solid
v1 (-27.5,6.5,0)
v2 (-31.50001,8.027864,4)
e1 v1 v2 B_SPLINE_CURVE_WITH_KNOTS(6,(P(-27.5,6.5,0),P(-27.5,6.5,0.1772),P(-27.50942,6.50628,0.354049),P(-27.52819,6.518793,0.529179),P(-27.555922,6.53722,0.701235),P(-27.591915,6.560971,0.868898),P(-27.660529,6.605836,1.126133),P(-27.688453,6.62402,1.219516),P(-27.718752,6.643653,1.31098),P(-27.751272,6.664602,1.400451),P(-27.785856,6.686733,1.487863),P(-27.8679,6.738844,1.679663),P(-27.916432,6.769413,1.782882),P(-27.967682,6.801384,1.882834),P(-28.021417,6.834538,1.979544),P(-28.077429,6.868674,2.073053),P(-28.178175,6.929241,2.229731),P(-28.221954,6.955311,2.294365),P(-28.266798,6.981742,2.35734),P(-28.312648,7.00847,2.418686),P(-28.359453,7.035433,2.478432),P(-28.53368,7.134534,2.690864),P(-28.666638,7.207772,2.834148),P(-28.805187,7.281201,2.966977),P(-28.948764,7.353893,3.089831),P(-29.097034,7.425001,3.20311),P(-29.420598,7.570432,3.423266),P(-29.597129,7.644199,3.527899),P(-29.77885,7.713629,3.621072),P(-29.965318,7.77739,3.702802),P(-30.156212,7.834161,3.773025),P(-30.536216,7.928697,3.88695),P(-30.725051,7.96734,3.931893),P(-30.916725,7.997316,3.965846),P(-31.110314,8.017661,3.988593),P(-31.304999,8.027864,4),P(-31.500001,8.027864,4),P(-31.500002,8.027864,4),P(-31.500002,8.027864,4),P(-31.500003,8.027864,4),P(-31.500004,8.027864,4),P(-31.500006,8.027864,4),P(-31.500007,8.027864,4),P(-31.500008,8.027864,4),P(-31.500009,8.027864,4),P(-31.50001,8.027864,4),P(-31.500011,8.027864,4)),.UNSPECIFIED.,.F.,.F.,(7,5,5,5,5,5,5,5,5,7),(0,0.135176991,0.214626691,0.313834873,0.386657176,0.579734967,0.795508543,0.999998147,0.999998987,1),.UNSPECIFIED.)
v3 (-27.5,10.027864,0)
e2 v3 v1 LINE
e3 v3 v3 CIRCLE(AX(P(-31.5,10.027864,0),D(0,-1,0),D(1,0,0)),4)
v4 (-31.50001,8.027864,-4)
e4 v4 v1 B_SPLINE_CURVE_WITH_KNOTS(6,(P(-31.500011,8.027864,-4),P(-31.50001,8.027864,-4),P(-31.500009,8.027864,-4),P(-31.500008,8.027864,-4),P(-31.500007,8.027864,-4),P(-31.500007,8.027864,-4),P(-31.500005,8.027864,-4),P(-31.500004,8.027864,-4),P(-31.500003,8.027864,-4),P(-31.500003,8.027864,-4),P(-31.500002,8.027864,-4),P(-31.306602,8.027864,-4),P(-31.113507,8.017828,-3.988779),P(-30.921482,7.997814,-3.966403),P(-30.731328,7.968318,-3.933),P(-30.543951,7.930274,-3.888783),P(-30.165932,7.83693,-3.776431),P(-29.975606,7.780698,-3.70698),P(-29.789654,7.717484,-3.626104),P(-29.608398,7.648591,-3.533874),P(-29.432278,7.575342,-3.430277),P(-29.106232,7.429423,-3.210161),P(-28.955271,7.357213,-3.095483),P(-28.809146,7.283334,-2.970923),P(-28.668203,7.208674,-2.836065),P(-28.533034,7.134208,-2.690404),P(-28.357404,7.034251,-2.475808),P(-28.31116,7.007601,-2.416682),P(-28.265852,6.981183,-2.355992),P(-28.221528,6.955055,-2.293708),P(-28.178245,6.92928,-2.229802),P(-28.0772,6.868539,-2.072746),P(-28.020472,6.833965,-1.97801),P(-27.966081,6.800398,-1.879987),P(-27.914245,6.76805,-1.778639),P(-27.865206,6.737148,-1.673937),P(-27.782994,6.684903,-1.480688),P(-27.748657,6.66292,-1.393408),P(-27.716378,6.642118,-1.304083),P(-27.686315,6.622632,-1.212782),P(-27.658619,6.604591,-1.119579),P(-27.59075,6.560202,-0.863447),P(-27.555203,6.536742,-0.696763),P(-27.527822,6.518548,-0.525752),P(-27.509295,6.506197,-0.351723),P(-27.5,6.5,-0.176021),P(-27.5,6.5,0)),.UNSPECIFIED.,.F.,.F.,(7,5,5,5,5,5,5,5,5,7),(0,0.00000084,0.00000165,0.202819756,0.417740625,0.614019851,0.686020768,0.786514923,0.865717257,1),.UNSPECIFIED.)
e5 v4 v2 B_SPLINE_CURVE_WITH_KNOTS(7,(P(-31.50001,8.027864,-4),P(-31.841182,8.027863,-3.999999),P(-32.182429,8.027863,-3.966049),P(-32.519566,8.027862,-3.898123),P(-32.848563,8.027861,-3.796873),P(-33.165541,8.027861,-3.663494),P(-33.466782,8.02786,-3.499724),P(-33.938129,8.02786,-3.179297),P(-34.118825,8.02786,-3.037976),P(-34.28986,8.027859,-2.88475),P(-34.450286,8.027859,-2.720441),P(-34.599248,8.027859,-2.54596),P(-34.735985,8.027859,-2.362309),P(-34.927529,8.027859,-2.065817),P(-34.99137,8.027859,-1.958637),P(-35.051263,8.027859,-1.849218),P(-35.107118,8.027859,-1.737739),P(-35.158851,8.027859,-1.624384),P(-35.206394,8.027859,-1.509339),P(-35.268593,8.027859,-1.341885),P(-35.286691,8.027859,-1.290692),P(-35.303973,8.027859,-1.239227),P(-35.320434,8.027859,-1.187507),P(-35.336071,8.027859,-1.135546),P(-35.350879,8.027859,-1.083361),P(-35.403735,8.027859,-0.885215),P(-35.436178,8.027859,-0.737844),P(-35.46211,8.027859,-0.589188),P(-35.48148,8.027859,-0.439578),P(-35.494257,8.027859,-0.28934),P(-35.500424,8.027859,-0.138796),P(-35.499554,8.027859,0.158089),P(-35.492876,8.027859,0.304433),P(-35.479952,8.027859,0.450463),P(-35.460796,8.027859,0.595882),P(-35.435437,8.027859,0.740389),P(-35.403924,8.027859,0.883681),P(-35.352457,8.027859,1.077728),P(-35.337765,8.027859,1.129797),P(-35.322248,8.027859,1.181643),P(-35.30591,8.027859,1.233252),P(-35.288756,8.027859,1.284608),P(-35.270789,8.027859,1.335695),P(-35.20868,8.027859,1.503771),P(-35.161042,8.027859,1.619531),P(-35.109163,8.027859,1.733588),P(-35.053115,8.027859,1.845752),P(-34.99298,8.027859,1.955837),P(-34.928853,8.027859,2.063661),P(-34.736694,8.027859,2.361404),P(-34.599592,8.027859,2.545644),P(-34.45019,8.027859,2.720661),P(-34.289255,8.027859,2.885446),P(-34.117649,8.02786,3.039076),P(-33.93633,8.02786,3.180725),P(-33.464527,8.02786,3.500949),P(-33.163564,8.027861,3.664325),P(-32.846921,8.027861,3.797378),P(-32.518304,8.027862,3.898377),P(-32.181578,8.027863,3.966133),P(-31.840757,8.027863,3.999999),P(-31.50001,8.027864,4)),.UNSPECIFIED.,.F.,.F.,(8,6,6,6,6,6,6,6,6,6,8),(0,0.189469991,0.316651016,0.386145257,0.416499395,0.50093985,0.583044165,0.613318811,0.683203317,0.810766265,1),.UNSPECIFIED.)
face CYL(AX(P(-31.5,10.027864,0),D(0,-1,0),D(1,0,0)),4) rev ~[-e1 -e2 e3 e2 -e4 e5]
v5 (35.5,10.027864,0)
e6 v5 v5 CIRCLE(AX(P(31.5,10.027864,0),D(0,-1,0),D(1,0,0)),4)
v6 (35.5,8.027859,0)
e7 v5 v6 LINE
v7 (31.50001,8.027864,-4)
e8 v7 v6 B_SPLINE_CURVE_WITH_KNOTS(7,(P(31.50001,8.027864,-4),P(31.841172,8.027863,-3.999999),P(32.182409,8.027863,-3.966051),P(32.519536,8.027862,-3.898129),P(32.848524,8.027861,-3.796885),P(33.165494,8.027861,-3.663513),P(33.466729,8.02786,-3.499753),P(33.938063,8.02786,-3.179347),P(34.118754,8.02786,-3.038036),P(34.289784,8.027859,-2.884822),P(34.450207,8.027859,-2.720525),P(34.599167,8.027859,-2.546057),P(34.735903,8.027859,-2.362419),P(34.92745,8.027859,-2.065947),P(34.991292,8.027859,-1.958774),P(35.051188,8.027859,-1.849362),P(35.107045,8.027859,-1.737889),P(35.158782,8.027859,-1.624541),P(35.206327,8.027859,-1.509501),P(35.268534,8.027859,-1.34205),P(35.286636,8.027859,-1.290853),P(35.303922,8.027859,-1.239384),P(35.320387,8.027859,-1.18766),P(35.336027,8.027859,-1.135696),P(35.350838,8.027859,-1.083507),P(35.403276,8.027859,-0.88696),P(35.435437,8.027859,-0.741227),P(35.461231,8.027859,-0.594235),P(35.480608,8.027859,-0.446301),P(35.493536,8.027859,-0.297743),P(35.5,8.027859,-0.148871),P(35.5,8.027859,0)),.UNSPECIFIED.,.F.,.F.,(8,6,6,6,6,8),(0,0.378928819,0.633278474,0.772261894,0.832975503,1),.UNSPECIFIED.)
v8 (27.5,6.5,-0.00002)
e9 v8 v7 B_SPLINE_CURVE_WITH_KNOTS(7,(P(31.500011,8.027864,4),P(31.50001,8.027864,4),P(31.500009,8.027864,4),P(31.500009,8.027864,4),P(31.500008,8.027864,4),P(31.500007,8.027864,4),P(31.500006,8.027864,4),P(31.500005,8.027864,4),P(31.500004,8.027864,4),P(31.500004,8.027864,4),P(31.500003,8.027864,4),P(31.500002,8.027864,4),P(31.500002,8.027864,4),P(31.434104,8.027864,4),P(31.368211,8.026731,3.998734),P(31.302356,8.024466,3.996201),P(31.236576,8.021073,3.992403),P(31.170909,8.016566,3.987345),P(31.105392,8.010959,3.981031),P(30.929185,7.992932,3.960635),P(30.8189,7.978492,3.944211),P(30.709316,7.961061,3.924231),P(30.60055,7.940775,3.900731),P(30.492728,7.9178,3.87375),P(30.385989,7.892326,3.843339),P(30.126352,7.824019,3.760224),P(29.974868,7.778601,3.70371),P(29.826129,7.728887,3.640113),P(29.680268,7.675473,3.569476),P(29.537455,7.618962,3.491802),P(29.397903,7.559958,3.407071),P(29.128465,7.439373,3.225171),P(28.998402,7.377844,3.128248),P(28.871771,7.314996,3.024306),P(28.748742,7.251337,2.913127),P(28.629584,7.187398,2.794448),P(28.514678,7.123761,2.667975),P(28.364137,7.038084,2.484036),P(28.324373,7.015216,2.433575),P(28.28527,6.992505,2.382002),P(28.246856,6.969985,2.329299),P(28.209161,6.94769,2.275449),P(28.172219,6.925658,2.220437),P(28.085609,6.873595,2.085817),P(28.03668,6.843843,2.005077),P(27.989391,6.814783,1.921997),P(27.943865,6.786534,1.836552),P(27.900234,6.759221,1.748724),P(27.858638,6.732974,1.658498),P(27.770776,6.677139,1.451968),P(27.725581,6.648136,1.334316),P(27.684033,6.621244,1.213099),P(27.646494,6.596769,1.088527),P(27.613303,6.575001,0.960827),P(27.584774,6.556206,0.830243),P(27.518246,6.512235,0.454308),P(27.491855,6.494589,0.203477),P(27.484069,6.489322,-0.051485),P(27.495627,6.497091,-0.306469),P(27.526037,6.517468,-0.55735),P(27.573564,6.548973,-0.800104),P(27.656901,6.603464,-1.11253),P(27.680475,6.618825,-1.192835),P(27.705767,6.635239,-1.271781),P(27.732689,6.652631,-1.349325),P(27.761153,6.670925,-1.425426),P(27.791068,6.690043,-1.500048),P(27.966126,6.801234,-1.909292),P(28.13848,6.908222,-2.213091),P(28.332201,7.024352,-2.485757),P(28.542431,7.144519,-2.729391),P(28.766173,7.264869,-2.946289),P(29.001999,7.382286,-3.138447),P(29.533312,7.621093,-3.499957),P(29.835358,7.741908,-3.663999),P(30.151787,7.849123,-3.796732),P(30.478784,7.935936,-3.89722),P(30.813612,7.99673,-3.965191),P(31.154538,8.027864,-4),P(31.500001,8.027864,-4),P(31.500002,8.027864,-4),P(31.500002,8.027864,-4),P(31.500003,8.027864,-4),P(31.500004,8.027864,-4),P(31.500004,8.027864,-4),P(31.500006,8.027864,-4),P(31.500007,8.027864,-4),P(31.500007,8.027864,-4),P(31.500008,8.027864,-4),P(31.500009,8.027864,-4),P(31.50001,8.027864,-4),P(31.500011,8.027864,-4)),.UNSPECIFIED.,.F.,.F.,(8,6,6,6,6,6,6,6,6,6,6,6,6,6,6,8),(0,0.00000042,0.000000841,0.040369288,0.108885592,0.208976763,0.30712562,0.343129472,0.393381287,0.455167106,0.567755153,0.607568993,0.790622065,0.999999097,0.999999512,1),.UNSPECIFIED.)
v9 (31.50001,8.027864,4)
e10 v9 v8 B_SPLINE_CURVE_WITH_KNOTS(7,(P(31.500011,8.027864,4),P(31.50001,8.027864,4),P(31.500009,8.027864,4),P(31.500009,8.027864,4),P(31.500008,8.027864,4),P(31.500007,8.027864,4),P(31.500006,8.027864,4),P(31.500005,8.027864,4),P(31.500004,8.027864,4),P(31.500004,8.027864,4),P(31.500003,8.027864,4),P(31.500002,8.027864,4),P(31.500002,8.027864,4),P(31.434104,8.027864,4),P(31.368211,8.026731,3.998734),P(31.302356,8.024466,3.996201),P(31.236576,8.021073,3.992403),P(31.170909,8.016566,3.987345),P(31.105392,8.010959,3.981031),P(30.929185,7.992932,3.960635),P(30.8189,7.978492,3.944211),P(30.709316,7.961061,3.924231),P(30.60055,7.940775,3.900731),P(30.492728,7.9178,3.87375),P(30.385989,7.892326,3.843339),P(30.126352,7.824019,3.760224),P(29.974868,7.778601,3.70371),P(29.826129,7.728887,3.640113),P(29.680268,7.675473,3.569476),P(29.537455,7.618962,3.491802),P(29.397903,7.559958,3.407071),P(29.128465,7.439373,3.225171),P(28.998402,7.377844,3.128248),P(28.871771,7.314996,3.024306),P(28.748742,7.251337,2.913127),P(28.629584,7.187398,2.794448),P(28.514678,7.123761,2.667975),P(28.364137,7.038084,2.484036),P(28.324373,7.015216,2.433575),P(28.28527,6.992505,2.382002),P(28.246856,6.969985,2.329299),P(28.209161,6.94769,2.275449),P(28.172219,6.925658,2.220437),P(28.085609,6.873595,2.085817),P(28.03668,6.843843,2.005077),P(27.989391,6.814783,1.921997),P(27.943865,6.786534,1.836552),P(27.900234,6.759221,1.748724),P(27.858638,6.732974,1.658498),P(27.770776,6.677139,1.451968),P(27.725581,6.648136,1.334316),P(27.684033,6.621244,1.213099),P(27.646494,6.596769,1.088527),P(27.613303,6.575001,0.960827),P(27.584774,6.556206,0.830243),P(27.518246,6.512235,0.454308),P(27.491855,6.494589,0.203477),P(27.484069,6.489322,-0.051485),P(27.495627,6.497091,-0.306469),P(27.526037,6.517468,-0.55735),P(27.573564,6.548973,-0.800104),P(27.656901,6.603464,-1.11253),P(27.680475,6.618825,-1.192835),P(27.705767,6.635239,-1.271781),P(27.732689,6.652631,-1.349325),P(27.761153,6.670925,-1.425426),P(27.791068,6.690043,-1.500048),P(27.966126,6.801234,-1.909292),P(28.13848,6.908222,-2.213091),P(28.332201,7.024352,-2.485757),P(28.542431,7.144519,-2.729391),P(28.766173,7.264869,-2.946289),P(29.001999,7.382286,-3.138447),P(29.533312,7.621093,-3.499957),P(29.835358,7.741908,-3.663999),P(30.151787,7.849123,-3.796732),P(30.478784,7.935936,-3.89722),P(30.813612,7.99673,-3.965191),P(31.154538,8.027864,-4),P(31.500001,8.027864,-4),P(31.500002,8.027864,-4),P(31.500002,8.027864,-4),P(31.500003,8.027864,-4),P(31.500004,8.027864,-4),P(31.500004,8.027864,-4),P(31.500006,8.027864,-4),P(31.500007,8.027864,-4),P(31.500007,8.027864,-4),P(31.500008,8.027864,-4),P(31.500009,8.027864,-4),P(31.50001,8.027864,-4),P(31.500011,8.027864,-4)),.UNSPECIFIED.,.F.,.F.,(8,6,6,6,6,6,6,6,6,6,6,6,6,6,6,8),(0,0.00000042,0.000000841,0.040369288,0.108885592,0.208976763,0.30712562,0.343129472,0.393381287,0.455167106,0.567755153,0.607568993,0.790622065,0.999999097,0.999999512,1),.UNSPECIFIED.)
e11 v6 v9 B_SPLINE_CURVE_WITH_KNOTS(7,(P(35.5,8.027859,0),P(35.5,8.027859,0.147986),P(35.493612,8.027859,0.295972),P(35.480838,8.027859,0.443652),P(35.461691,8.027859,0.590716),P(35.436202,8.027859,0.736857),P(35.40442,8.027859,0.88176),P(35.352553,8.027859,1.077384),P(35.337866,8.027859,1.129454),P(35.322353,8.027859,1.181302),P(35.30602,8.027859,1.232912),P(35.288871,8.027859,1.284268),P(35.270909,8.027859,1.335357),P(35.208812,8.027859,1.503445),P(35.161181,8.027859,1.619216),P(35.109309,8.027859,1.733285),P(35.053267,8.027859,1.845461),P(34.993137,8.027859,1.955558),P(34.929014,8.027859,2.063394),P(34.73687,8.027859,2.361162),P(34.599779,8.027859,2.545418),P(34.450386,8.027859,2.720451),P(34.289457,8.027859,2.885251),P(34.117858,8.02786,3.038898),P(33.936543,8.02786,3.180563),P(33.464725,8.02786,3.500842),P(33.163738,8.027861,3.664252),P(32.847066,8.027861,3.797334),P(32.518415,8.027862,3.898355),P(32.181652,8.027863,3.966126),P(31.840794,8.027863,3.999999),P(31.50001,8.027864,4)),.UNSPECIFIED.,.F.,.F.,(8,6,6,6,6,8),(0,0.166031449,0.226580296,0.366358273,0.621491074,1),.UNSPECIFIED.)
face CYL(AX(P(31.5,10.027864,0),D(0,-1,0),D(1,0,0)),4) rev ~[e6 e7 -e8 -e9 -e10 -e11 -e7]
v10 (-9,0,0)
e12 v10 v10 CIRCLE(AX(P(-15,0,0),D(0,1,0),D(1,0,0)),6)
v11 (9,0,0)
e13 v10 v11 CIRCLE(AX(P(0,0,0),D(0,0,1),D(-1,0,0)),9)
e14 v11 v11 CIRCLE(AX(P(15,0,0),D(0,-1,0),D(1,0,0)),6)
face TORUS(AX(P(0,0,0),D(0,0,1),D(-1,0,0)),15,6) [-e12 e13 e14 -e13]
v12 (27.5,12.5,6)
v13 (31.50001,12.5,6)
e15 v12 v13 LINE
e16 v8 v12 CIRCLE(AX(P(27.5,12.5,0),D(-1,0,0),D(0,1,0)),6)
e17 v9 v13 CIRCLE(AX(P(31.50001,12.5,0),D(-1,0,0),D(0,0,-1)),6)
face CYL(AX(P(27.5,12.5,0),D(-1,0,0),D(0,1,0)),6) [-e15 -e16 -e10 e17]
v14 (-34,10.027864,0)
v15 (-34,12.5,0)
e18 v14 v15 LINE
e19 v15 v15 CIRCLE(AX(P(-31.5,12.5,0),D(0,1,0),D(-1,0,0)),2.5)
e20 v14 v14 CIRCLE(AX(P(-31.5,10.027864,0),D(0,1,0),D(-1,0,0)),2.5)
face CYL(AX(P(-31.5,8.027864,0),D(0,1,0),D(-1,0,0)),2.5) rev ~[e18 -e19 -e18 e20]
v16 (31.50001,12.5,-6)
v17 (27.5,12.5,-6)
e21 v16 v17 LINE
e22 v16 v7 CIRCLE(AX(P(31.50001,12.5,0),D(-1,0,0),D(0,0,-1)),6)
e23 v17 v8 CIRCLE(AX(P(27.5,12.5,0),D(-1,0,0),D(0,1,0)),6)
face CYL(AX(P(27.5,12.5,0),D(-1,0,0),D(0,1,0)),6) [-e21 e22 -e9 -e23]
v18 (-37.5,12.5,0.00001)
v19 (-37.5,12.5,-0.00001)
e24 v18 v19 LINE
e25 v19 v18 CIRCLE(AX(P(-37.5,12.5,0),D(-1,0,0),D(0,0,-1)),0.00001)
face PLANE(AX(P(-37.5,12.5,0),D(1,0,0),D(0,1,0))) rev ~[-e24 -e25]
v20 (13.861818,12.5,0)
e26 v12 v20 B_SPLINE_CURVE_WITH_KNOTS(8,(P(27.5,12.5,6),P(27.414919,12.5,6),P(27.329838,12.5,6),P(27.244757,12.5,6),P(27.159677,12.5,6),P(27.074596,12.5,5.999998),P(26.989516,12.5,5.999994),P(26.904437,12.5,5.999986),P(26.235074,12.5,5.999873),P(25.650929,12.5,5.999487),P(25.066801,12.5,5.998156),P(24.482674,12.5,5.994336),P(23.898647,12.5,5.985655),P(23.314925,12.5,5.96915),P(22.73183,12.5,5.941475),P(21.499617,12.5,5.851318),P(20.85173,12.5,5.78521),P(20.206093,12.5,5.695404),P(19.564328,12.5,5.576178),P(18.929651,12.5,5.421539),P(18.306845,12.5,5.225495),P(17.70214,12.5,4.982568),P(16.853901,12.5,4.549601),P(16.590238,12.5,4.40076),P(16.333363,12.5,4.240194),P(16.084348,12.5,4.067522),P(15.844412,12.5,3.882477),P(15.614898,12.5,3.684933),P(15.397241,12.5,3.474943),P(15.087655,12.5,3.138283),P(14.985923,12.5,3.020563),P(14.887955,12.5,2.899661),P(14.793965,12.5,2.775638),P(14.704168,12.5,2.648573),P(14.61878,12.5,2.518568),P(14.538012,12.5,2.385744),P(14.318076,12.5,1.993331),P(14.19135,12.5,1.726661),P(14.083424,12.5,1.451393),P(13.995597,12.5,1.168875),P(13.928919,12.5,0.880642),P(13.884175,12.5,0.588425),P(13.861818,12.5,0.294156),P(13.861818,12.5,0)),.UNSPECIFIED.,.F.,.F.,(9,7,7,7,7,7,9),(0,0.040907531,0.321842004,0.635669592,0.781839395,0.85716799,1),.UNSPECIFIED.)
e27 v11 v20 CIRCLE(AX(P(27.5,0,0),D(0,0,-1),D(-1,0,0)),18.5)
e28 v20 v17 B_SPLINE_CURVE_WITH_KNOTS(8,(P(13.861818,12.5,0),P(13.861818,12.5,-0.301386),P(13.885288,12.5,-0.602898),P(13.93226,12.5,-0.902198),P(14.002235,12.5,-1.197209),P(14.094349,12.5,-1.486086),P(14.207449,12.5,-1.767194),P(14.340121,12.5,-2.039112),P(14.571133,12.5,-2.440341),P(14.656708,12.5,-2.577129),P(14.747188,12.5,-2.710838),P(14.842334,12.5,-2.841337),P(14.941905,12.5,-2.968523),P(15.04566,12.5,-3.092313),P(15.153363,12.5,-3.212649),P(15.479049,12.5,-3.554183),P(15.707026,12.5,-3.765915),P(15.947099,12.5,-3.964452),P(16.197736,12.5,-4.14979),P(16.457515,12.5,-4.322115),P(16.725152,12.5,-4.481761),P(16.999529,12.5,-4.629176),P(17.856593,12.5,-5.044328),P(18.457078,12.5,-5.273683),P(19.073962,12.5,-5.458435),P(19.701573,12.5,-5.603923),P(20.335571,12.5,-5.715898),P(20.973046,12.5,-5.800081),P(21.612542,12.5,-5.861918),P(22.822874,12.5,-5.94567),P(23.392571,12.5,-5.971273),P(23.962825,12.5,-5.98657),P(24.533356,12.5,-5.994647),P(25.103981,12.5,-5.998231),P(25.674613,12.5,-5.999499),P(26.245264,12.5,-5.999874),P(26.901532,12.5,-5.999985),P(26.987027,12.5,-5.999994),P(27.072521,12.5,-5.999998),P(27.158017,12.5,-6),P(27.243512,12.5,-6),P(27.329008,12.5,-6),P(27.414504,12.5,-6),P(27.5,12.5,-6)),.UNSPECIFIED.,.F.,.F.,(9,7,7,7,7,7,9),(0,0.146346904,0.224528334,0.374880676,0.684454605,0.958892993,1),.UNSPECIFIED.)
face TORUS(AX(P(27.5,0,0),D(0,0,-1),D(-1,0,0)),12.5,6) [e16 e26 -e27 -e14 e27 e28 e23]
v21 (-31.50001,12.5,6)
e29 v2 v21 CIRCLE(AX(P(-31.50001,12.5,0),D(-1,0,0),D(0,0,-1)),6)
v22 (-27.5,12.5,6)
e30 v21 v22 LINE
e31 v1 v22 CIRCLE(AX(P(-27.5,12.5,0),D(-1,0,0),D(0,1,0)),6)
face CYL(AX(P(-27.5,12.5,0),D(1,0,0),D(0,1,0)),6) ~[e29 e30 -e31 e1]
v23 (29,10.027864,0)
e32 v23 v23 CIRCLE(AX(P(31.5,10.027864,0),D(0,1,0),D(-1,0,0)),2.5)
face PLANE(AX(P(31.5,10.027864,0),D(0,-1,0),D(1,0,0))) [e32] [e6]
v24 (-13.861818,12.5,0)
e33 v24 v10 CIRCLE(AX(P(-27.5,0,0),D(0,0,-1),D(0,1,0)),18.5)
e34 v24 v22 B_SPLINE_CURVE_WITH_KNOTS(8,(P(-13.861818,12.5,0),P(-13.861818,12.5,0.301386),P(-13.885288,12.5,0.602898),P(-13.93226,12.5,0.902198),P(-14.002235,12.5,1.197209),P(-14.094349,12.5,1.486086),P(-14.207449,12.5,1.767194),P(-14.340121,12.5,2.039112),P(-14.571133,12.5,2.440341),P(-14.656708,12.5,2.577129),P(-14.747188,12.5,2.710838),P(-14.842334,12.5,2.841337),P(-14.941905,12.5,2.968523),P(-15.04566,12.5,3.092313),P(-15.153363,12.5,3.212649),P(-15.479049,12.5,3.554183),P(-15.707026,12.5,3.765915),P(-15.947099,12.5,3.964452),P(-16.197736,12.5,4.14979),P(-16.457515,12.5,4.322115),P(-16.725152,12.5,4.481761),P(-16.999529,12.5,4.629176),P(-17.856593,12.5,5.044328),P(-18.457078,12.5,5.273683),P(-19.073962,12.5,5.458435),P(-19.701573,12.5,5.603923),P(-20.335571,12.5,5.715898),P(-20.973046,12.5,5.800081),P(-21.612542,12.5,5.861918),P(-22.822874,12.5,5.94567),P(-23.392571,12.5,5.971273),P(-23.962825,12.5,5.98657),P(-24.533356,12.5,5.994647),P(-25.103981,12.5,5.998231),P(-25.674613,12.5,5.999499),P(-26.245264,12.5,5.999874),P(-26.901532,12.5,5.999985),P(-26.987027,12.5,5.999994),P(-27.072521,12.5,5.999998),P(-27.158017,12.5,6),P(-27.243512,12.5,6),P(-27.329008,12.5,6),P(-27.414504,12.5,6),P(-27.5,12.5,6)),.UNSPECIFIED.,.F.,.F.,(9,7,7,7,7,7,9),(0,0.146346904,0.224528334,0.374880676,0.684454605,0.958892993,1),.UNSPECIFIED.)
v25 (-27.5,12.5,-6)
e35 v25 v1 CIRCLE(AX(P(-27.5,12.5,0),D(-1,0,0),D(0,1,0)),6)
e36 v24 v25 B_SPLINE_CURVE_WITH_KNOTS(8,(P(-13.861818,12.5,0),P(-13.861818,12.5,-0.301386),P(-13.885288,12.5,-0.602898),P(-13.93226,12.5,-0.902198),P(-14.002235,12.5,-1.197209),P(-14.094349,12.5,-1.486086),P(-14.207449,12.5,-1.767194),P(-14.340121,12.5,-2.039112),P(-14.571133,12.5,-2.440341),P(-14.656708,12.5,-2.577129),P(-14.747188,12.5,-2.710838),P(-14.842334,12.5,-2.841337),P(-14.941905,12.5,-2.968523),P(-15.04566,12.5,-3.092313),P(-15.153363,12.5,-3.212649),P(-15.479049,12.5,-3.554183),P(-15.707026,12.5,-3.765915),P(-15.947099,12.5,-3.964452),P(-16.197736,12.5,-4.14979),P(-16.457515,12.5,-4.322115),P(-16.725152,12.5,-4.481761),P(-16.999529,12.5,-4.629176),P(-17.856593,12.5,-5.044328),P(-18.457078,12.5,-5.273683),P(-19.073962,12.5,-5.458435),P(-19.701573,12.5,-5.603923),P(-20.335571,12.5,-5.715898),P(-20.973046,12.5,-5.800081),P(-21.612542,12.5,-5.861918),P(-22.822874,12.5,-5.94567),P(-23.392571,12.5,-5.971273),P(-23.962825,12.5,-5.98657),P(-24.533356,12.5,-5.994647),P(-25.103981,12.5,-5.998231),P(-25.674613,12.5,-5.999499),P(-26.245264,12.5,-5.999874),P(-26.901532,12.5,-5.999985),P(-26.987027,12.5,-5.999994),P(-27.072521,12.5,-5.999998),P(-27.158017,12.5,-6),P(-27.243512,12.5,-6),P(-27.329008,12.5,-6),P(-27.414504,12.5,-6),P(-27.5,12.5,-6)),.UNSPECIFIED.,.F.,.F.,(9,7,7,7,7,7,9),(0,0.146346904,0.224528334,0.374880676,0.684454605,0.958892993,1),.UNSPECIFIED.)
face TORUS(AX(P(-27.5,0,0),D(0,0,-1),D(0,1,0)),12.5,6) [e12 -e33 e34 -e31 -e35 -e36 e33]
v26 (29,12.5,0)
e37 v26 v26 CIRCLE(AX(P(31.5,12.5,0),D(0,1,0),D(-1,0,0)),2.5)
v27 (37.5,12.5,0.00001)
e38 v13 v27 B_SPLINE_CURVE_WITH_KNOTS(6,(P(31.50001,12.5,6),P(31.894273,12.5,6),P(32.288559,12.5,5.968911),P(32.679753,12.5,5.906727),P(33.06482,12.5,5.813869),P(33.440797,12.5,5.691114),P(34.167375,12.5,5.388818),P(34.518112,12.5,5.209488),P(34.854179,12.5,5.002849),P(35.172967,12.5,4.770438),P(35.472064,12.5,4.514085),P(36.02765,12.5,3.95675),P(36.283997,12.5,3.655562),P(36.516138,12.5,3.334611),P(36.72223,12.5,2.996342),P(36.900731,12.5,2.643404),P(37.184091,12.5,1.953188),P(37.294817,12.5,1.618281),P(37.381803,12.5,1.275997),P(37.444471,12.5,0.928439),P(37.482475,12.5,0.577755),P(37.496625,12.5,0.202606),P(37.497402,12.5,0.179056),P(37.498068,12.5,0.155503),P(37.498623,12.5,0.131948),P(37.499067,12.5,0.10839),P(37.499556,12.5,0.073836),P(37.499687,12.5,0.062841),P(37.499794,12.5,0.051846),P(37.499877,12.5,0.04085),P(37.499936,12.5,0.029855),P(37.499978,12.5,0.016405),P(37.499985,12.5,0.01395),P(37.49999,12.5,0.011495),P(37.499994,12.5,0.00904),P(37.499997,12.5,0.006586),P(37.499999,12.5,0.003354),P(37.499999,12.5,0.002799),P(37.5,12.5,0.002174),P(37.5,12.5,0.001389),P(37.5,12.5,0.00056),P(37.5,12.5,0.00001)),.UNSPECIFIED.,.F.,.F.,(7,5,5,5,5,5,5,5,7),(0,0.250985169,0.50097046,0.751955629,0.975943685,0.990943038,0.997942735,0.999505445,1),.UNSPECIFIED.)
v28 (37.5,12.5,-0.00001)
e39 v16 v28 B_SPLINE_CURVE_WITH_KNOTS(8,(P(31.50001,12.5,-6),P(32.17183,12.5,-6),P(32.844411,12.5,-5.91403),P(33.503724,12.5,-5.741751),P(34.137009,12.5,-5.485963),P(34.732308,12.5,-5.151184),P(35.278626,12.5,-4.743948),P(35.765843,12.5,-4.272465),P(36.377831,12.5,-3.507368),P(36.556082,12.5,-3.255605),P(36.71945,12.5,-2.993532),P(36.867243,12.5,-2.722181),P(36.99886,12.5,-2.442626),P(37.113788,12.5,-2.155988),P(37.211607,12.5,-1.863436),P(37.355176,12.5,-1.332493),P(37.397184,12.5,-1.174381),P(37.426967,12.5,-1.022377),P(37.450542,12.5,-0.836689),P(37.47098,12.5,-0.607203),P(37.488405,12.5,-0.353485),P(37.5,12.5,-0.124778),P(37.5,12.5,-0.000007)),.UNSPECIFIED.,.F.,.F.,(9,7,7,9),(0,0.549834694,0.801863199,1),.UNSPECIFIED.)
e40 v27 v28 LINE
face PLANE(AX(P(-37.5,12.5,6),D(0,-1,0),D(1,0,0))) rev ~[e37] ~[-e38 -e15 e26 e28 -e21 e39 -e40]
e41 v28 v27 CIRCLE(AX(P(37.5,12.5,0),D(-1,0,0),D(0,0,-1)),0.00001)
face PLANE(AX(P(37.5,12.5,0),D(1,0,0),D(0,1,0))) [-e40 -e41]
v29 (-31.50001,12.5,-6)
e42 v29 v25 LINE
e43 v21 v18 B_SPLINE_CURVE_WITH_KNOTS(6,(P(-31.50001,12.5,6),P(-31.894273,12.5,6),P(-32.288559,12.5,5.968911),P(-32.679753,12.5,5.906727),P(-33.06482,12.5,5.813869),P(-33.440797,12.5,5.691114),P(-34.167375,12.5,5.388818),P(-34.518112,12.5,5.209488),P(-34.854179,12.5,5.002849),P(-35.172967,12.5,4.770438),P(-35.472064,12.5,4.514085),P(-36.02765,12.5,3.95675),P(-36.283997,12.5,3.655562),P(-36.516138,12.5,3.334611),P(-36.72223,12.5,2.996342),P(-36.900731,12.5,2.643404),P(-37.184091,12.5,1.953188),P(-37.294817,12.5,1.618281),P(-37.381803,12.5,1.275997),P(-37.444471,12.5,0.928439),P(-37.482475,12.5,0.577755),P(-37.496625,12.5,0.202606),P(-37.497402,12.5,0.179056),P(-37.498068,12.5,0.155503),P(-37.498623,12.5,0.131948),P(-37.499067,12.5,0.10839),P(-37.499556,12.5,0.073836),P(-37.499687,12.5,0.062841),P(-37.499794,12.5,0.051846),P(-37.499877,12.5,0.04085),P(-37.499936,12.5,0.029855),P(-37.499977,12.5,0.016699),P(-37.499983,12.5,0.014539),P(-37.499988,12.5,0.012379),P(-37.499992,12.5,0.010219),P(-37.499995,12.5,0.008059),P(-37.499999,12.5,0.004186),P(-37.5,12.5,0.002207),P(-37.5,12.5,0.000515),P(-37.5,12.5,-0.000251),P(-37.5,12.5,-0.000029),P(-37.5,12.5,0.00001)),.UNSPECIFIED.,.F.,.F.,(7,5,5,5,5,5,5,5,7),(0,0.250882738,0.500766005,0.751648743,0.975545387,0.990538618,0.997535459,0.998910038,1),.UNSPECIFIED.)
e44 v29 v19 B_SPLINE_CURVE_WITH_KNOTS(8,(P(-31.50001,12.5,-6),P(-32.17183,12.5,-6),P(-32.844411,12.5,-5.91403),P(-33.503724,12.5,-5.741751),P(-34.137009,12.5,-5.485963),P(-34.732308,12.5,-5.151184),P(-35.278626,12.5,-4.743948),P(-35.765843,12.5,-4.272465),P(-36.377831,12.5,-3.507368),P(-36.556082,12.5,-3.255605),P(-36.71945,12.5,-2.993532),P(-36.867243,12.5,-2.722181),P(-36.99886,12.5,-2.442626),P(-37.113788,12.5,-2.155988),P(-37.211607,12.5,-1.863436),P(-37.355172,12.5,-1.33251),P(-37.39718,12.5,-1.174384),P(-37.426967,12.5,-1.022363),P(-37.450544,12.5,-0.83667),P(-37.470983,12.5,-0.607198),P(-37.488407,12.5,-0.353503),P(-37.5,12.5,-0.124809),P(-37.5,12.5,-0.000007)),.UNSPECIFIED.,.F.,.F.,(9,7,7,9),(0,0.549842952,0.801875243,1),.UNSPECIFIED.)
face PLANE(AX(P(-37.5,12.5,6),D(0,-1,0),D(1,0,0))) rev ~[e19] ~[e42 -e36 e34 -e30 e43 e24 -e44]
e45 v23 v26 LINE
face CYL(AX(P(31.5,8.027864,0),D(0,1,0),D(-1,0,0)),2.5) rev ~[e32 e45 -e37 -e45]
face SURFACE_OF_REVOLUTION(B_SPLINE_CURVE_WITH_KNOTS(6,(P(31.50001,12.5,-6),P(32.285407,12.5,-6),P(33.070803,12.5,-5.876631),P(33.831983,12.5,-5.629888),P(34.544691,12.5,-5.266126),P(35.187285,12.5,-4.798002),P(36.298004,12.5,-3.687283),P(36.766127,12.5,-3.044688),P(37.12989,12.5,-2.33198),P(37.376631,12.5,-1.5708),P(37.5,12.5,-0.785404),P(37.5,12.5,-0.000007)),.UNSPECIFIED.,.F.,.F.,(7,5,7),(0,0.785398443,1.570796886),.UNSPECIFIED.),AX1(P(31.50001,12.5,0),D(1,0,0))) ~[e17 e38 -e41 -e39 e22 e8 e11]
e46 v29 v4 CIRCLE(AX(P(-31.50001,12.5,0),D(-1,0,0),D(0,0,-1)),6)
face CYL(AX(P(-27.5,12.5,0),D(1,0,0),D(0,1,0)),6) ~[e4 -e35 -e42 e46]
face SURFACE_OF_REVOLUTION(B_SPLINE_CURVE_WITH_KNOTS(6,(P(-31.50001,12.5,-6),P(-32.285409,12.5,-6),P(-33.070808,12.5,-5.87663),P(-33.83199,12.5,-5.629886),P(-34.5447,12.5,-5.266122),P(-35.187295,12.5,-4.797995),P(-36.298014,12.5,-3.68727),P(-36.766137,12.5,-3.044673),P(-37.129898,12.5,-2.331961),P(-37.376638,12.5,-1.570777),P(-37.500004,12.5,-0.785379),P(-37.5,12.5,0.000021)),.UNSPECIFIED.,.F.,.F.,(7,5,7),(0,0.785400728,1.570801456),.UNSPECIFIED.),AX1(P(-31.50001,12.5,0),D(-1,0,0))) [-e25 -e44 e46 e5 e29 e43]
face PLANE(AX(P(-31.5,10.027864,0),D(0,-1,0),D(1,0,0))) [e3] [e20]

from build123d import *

# Parameters (mm, degrees)
F2_R            = 6
F4_DEPTH        = 10
F5_DEPTH        = 10
F9_W            = 85.8580678701
F9_H            = 17.2091361135
F10_DEPTH       = 25
F11_R           = 5.99999
F14_D           = 5
F14_START       = 1.5278641
F14_START_2     = 1.5278642
F14_CBORE_D     = 8
F14_CBORE_DEPTH = 2


# Not quite as in the source:
# - a fillet or chamfer is up to 0.001 mm smaller than in the source, because OpenCascade refuses the exact size


with BuildPart() as f3:
    # F3: sweep along a path in F0
    with BuildLine(Plane.XY) as f3_path:
        ThreePointArc((-27.5, 12.5), (-18.6611652352, 8.8388347648), (-15, 0))
        ThreePointArc((-15, 0), (0, -15), (15, 0))
        ThreePointArc((15, 0), (18.6611652352, 8.8388347648), (27.5, 12.5))
    # F2 (on offset) → F3 (sweep)
    with BuildSketch(Plane.YZ.offset(-27.5)):
        with Locations((12.5, 0)):
            Circle(F2_R)
    sweep(path=f3_path.line)

    # F4 (add): a face of the model
    f4_faces = [f3.faces().sort_by_distance(p)[0] for p in [
        (27.5, 12.5, 0),
    ]]
    extrude(f4_faces, amount=F4_DEPTH)

    # F5 (add): a face of the model
    f5_faces = [f3.faces().sort_by_distance(p)[0] for p in [
        (-27.5, 12.5, 0),
    ]]
    extrude(f5_faces, amount=F5_DEPTH)

    # F9 (on offset) → F10 (cut)
    with BuildSketch(Plane.XY.offset(6)):
        with Locations((5.4290339351, 21.1045680568)):
            Rectangle(F9_W, F9_H)
    extrude(amount=-F10_DEPTH, mode=Mode.SUBTRACT)

    # F11 (radius 6 in the source; OpenCascade refuses exactly that, so slightly less here)
    f11_edges = [f3.edges().sort_by_distance(p)[0] for p in [
        (-37.5, 6.5, 0),
        (37.5, 6.5, 0),
    ]]
    fillet(f11_edges, radius=F11_R)

    # F14 (through all)
    # its depths count from where the whole tool has entered the part; down to there all is cleared
    with Locations(Plane.XZ.offset(-6.5)):
        with Locations((-31.5, 0, -F14_START), (31.5, 6.2e-09, -F14_START_2)):
            CounterBoreHole(F14_D / 2, F14_CBORE_D / 2, F14_CBORE_DEPTH)


solid = f3.part
